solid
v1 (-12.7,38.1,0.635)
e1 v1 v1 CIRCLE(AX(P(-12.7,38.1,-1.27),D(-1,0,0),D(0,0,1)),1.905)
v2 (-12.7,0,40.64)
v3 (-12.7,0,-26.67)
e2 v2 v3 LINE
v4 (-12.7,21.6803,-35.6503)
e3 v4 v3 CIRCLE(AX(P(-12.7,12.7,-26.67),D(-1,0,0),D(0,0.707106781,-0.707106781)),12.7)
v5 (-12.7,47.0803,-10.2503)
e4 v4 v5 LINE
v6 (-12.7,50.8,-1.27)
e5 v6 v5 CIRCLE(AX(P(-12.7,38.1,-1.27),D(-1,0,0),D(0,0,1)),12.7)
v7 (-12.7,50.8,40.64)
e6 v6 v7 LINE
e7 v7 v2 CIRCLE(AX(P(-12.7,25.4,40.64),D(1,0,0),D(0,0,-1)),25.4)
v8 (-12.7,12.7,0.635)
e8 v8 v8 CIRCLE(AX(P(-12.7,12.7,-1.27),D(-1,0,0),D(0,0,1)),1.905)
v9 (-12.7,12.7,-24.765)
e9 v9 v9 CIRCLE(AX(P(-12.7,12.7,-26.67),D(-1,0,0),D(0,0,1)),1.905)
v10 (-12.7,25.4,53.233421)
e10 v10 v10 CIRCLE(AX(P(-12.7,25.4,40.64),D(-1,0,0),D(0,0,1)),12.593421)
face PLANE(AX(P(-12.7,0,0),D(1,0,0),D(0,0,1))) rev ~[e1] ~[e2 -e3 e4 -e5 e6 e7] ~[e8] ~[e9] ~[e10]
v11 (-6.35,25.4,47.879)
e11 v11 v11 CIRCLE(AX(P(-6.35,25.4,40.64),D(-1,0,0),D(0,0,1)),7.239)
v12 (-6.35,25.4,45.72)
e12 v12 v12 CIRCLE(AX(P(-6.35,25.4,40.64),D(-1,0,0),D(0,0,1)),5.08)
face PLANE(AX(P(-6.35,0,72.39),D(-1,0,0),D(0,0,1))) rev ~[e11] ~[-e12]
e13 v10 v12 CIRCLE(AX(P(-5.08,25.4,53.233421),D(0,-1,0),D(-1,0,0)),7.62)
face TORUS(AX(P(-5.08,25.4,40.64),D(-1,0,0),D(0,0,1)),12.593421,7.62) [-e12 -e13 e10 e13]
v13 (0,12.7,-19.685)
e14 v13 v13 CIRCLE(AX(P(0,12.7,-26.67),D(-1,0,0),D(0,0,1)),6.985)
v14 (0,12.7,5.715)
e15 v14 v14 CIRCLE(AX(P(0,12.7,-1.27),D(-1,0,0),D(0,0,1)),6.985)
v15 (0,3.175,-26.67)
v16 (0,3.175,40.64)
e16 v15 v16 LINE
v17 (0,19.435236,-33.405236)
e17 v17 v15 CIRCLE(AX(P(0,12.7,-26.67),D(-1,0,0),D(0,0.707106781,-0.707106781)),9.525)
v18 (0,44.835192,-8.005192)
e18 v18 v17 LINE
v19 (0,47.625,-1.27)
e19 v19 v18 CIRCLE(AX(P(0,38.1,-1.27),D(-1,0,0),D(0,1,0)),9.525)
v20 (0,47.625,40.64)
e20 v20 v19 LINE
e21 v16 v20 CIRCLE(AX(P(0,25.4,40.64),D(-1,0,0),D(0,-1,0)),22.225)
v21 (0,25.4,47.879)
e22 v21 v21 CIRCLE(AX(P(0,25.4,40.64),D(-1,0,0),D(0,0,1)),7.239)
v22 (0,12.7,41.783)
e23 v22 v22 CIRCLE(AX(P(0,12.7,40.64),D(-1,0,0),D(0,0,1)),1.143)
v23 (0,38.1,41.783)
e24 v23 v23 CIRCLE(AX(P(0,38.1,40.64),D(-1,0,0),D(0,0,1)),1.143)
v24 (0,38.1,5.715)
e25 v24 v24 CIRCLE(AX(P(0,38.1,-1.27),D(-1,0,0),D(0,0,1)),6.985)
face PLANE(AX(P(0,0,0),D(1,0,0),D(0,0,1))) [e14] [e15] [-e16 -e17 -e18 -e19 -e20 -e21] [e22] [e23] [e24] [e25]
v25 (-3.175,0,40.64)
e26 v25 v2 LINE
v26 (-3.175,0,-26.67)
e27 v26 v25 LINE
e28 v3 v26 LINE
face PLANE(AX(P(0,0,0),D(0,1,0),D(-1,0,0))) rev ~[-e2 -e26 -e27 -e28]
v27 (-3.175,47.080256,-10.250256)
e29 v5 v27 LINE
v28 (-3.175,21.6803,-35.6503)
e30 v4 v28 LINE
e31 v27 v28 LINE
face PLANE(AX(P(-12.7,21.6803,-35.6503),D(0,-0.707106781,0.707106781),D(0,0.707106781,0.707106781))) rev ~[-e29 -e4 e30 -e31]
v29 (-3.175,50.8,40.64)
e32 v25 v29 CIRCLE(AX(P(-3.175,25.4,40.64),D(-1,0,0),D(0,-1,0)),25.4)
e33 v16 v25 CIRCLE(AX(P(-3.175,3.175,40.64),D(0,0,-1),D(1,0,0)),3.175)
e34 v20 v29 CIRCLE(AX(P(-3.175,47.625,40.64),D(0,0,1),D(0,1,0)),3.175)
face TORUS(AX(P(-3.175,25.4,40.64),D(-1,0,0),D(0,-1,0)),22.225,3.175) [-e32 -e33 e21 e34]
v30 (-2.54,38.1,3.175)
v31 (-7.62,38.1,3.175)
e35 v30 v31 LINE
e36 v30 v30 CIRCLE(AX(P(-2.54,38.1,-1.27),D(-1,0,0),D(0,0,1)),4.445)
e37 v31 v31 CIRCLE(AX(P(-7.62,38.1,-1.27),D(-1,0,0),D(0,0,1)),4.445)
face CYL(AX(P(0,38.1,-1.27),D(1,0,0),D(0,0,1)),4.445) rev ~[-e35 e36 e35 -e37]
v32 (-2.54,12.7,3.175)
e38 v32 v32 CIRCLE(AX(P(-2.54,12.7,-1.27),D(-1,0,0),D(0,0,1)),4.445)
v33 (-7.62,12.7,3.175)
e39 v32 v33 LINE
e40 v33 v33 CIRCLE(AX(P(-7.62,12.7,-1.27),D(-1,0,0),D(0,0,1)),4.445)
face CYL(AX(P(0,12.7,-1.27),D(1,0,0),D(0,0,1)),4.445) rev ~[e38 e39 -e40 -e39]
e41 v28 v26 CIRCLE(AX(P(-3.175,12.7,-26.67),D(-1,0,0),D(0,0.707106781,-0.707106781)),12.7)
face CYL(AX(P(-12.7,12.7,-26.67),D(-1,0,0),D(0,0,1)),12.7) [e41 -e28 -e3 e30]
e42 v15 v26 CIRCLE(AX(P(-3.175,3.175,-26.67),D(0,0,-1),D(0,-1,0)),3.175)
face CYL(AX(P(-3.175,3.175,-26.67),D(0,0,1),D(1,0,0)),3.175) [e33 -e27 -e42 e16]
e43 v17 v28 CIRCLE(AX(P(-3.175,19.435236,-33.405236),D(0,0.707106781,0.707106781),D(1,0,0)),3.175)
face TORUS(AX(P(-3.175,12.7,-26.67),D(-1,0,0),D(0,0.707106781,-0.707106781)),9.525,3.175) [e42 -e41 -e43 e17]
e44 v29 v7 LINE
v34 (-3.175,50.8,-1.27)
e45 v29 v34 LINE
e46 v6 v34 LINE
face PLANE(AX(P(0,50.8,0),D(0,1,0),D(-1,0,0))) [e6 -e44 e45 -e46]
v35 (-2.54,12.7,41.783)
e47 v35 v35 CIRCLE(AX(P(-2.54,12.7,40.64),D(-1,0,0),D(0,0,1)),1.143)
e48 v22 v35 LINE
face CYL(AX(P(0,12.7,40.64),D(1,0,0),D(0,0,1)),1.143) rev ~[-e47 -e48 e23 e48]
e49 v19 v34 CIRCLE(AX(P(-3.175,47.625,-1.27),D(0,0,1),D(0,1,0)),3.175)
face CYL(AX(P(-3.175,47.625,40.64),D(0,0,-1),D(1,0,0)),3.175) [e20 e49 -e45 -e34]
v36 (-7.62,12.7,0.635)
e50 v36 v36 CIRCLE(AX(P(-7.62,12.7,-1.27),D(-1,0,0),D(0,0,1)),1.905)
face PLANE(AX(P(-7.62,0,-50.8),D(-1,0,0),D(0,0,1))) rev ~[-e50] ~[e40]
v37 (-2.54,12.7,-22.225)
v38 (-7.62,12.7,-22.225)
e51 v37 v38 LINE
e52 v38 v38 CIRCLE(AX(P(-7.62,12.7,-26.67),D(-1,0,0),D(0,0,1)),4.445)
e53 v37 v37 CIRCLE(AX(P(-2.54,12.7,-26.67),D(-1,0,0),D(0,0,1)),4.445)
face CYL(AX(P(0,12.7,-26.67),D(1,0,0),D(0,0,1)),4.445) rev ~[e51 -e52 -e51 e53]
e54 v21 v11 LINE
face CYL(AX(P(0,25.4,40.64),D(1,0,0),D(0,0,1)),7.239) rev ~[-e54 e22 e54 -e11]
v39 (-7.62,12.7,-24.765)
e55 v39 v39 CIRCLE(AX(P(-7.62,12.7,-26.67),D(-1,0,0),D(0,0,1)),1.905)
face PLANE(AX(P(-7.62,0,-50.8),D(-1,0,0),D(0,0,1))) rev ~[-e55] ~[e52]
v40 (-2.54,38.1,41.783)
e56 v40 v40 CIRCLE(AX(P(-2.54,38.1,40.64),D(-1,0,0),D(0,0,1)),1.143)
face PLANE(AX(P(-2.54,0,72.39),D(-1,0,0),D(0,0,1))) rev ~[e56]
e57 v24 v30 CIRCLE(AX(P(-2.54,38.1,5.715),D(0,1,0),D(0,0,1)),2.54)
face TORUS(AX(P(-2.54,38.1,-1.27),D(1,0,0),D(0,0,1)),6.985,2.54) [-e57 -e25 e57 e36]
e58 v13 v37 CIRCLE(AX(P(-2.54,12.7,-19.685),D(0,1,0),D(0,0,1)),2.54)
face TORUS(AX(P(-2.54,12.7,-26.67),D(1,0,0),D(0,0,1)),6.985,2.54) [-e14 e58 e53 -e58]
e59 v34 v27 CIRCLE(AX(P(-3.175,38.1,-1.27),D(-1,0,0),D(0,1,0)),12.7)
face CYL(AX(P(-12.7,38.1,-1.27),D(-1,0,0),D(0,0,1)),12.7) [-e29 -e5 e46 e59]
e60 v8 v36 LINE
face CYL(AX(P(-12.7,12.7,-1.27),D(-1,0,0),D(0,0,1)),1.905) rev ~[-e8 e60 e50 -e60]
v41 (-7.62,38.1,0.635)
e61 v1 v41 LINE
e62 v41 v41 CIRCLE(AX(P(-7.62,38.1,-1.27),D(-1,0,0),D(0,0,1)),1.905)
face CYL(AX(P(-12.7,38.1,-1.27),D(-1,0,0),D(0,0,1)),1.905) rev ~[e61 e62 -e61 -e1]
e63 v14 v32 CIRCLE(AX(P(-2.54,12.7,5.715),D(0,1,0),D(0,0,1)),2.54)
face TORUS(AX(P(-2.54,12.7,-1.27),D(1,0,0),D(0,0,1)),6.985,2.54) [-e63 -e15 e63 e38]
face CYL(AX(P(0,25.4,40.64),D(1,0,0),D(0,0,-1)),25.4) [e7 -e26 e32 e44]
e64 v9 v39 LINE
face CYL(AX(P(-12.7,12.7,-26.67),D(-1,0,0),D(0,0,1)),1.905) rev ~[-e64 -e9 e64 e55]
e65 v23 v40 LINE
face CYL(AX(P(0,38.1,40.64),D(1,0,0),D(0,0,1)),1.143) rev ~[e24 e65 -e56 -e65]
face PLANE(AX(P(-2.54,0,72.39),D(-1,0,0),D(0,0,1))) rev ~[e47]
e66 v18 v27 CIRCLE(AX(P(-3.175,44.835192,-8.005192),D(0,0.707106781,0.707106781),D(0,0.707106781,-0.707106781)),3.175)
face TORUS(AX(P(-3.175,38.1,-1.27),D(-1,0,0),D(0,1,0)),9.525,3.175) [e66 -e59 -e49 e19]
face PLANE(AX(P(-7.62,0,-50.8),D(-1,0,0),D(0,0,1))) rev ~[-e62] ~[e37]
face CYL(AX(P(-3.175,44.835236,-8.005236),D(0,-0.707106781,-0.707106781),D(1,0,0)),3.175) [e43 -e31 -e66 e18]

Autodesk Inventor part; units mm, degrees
ref_plane "YZ Plane" through (0, 0, 0) normal (1, 0, 0) x (0, 1, 0)
ref_plane "XZ Plane" through (0, 0, 0) normal (0, 1, 0) x (-1, 0, 0)
ref_plane "XY Plane" through (0, 0, 0) normal (0, 0, 1) x (1, 0, 0)
sketch "Sketch1" plane through (0, 0, 0) normal (0, 1, 0) x (-1, 0, 0)
  line L0 (0, 0) -> (0, 8.89)
  line L1 (0, 0) -> (12.7, 0)
  line L2 (12.7, 0) -> (12.7, 8.89)
  line L3 (12.7, 8.89) -> (0, 8.89)
  line L4 (0, 8.89) -> (0, 72.39)
  line L5 (0, 0) -> (-139.7, 0) construction
  line L6 (12.7, 0) -> (12.7, -50.8)
  line L7 (12.7, -50.8) -> (0, -50.8)
  line L8 (0, -50.8) -> (0, 0)
  line L9 (0, 40.64) -> (-26.416, 40.64) construction
  line L10 (-26.416, 40.64) -> (-39.116, 40.64) construction
  line L11 (-39.116, 40.64) -> (-140.716, 40.64) construction
  line L12 (0, 72.39) -> (12.7, 72.39)
  line L13 (12.7, 72.39) -> (12.7, 8.89)
  dimension "d1" = 8.89
  dimension "d3" = 12.7
  dimension "d4" = 63.5
  dimension "d6" = 139.7
  dimension "d7" = 50.8
  dimension "d8" = 26.416
  dimension "d9" = 12.7
  dimension "d10" = 101.6
  dimension "d13" = 31.75
extrude "Extrusion1" add sketch "Sketch1" along normal blind 50.8
sketch "Sketch2" plane through (-12.7, 0, -50.8) normal (-1, 0, 0) x (0, 0, 1)
  line L0 (123.19, 0) -> (0, 0) construction
  line L1 (0, 0) -> (50.8, 0) construction
  line L2 (50.8, 0) -> (59.69, 0) construction
  line L3 (59.69, 0) -> (123.19, 0) construction
  line L4 (123.19, 0) -> (123.19, 50.8) construction
  line L5 (0, 0) -> (0, 50.8) projected
  circle A0 centre (49.53, 38.1) radius 1.905
  circle A1 centre (24.13, 12.7) radius 1.905
  circle A2 centre (49.53, 12.7) radius 1.905
  circle A3 centre (49.53, 38.1) radius 4.445
  circle A4 centre (24.13, 12.7) radius 4.445
  circle A5 centre (49.53, 12.7) radius 4.445
  line L6 (0, 25.4) -> (13.335, 25.4)
  line L7 (59.69, 0) -> (59.69, 50.8)
  line L8 (123.19, 50.8) -> (0, 50.8) projected
  dimension "d16" = 50.8
  dimension "d17" = 63.5
  dimension "d32" = 3.81
  dimension "d34" = 3.81
  dimension "d36" = 3.81
  dimension "d38" = 8.89
  dimension "d39" = 8.89
  dimension "d40" = 8.89
  dimension "d41" = 25.4
  dimension "d42" = 25.4
  dimension "d43" = 10.16
  dimension "d49" = 12.7
  dimension "d50" = 12.7
  dimension "d51" = 12.7
extrude "Extrusion4" cut sketch "Sketch2" against normal through all contours A0 | A1 | A2
extrude "Extrusion5" cut sketch "Sketch2" along normal blind 7.62 from surface at -12.7 contours A0 | A3 | A4 | A5
chamfer "Chamfer1" distance 25.4 angle 45 1 edges at (-6.35, 50.8, -50.8)
fillet "Fillet3" radius 12.7 3 edges at (-6.35, 50.8, -25.4) (-6.35, 25.4, -50.8) (-6.35, 0, -50.8)
fillet "Fillet8" radius 2.54 3 edges at (0, 12.7, -31.115) (0, 12.7, -5.715) (0, 38.1, -5.715)
sketch "Sketch6" plane through (-12.7, 0, 72.39) normal (-1, 0, 0) x (0, 0, 1)
  line L0 (0, 0) -> (0, 50.8) projected
  line L1 (0, 0) -> (0, 50.8) projected
  line L2 (0, 25.4) -> (-31.75, 25.4) construction
  circle A0 centre (-31.75, 25.4) radius 7.239
  circle A1 centre (-31.75, 25.4) radius 5.08
  point P0 (-72.39, 0)
  dimension "d87" = 31.75
  dimension "d88" = 14.478
  dimension "d89" = 10.16
extrude "Extrusion11" cut sketch "Sketch6" along normal blind 6.35 from surface at -12.7
extrude "Extrusion12" cut sketch "Sketch6" against normal through all contours A1
sketch "Sketch7" plane through (-12.7, 0, 72.39) normal (-1, 0, 0) x (0, 0, 1)
  circle A0 centre (-31.75, 25.4) radius 7.239 construction
  line L0 (-31.75, 25.4) -> (-31.75, 38.1) construction
  line L1 (-31.75, 25.4) -> (-31.75, 12.7) construction
  circle A1 centre (-31.75, 38.1) radius 1.143
  circle A2 centre (-31.75, 12.7) radius 1.143
  point P0 (-72.39, 0)
  dimension "d95" = 12.7
  dimension "d96" = 12.7
  dimension "d97" = 2.286
  dimension "d98" = 2.286
extrude "Extrusion13" cut sketch "Sketch7" along normal blind 2.54 from surface at -12.7
sketch "Sketch8" plane through (0, 0, 72.39) normal (1, 0, 0) x (0, 0, -1)
  circle A0 centre (31.75, 25.4) radius 5.08 projected
  circle A1 centre (31.75, 25.4) radius 25.4
  line L0 (92.5295, 50.8) -> (0, 50.8) projected
  line L1 (31.75, 50.8) -> (0, 50.8)
  line L2 (0, 0) -> (0, 50.8) projected
  line L3 (0, 0) -> (31.75, 0)
  line L4 (110.49, 0) -> (0, 0) projected
  point P0 (72.39, 0)
extrude "Extrusion14" cut sketch "Sketch8" against normal through all contours A1 L3 L2 L0
sketch "Sketch9" plane through (-12.7, 12.7, -50.8) normal (-1, 0, 0) x (0, 0, 1)
  circle A0 centre (24.13, 0) radius 1.905 construction
  line L0 (24.13, 0) -> (24.13, -12.7) construction
  line L1 (91.44, -12.7) -> (12.7, -12.7) construction
  line L2 (24.13, 0) -> (11.43, 0) construction
  line L3 (11.43, 0) -> (11.43, 24.13)
  line L4 (21.6803, 34.3803) -> (3.7197, 16.4197) construction
  arc A1 (0, 0) -> (12.7, -12.7) centre (12.7, 0) ccw construction
  circle A2 centre (49.53, 0) radius 1.905 construction
  circle A3 centre (24.13, 0) radius 1.905 construction
  circle A4 centre (49.53, 25.4) radius 1.905 construction
  arc A5 (91.44, -12.7) -> (91.44, 38.1) centre (91.44, 12.7) ccw construction
  line L5 (30.6605, 38.1) -> (91.44, 38.1) construction
  arc A6 (30.6605, 38.1) -> (21.6803, 34.3803) centre (30.6605, 25.4) ccw construction
  line L6 (3.7197, 16.4197) -> (21.6803, 34.3803) construction
  arc A7 (3.7197, 16.4197) -> (0, 7.4395) centre (12.7, 7.4395) ccw construction
  line L7 (0, 0) -> (0, 7.4395) construction
  arc A8 (0, 0) -> (12.7, -12.7) centre (12.7, 0) ccw construction
  line L8 (12.7, -12.7) -> (91.44, -12.7) construction
  circle A9 centre (91.44, 12.7) radius 5.08 construction
  line L9 (3.7197, 16.4197) -> (21.6803, 34.3803) projected
  arc A10 (3.7197, 16.4197) -> (0, 7.4395) centre (12.7, 7.4395) ccw projected
  arc A11 (0, 0) -> (12.7, -12.7) centre (12.7, 0) ccw projected
  line L10 (0, 20.1395) -> (0, -8.6122)
  circle A12 centre (49.53, 25.4) radius 1.905 projected
  circle A13 centre (49.53, 25.4) radius 12.7
  circle A14 centre (24.13, 0) radius 6.985 projected
  circle A15 centre (24.13, 0) radius 12.7
  line L11 (15.1497, 8.9803) -> (40.5497, 34.3803)
  arc A16 (30.6605, 38.1) -> (21.6803, 34.3803) centre (30.6605, 25.4) ccw projected
  line L12 (123.19, 38.1) -> (0, 38.1) projected
  line L13 (12.7, -12.7) -> (91.44, -12.7) projected
  line L14 (24.13, -12.7) -> (12.7, -12.7)
  point P0 (50.8, -12.7)
  point P1 (11.43, -12.6363)
  point P2 (0, 7.4395)
  point P3 (49.53, 38.1)
  point P4 (24.13, -12.7)
  dimension "d108" = 12.7
  dimension "d56" = 31.75
  dimension "d57" = 2.286
  dimension "d58" = 8.89
  dimension "d59" = 2.286
  dimension "d60" = 8.89
  dimension "d61" = 2.286
  dimension "d62" = 7.62
  dimension "d63" = 2.286
  dimension "d64" = 7.62
  dimension "d65" = 6.35
  dimension "d66" = 6.35
  dimension "d67" = 6.35
  dimension "d68" = 6.35
  dimension "d69" = 6.35
extrude "Extrusion16" cut sketch "Sketch9" against normal through all contours A15 L13 A11 L10 A10 L9 L3 | L3 L9 A16 L12 A13 L11 A15
fillet "Fillet13" radius 3.175 6 edges at (0, 49.8333, -6.1301) (0, 50.8, 19.685) (0, 25.4, 66.04) (0, 0, 6.985) (0, 7.8399, -38.4033) (0, 34.3803, -22.9503)
fillet "Fillet14" radius 7.62 1 edges at (-12.7, 25.4, 35.56)
sketch "Sketch4" plane through (0, 0, 72.39) normal (1, 0, 0) x (0, 0, -1)
  circle A0 centre (31.75, 25.4) radius 3.175 projected
  circle A1 centre (31.75, 25.4) radius 13.97 construction
  circle A2 centre (31.75, 25.4) radius 19.05
  circle A3 centre (31.75, 25.4) radius 25.4
  line L0 (0, 0) -> (110.49, 0) projected
  line L1 (31.75, 25.4) -> (45.72, 46.6132)
  line L2 (31.75, 25.4) -> (45.72, 4.1868)
  point P0 (72.39, 0)
  point P1 (42.2275, 9.4901)
  point P2 (42.2275, 41.3099)
  dimension "d77" = 27.94
  dimension "d78" = 38.1
sketch "Sketch5" plane through (0, 0, 72.39) normal (1, 0, 0) x (0, 0, -1)
  arc A0 (31.75, 50.8) -> (31.75, 0) centre (31.75, 25.4) ccw projected
  line L0 (0, 50.8) -> (31.75, 50.8) projected
  line L1 (0, 0) -> (0, 50.8) projected
  line L2 (0, 0) -> (31.75, 0) projected
  point P0 (72.39, 0)
equation "\"d13\" = 0.5 * d4"
properties part number "bearing_bracket_3DPrint"
